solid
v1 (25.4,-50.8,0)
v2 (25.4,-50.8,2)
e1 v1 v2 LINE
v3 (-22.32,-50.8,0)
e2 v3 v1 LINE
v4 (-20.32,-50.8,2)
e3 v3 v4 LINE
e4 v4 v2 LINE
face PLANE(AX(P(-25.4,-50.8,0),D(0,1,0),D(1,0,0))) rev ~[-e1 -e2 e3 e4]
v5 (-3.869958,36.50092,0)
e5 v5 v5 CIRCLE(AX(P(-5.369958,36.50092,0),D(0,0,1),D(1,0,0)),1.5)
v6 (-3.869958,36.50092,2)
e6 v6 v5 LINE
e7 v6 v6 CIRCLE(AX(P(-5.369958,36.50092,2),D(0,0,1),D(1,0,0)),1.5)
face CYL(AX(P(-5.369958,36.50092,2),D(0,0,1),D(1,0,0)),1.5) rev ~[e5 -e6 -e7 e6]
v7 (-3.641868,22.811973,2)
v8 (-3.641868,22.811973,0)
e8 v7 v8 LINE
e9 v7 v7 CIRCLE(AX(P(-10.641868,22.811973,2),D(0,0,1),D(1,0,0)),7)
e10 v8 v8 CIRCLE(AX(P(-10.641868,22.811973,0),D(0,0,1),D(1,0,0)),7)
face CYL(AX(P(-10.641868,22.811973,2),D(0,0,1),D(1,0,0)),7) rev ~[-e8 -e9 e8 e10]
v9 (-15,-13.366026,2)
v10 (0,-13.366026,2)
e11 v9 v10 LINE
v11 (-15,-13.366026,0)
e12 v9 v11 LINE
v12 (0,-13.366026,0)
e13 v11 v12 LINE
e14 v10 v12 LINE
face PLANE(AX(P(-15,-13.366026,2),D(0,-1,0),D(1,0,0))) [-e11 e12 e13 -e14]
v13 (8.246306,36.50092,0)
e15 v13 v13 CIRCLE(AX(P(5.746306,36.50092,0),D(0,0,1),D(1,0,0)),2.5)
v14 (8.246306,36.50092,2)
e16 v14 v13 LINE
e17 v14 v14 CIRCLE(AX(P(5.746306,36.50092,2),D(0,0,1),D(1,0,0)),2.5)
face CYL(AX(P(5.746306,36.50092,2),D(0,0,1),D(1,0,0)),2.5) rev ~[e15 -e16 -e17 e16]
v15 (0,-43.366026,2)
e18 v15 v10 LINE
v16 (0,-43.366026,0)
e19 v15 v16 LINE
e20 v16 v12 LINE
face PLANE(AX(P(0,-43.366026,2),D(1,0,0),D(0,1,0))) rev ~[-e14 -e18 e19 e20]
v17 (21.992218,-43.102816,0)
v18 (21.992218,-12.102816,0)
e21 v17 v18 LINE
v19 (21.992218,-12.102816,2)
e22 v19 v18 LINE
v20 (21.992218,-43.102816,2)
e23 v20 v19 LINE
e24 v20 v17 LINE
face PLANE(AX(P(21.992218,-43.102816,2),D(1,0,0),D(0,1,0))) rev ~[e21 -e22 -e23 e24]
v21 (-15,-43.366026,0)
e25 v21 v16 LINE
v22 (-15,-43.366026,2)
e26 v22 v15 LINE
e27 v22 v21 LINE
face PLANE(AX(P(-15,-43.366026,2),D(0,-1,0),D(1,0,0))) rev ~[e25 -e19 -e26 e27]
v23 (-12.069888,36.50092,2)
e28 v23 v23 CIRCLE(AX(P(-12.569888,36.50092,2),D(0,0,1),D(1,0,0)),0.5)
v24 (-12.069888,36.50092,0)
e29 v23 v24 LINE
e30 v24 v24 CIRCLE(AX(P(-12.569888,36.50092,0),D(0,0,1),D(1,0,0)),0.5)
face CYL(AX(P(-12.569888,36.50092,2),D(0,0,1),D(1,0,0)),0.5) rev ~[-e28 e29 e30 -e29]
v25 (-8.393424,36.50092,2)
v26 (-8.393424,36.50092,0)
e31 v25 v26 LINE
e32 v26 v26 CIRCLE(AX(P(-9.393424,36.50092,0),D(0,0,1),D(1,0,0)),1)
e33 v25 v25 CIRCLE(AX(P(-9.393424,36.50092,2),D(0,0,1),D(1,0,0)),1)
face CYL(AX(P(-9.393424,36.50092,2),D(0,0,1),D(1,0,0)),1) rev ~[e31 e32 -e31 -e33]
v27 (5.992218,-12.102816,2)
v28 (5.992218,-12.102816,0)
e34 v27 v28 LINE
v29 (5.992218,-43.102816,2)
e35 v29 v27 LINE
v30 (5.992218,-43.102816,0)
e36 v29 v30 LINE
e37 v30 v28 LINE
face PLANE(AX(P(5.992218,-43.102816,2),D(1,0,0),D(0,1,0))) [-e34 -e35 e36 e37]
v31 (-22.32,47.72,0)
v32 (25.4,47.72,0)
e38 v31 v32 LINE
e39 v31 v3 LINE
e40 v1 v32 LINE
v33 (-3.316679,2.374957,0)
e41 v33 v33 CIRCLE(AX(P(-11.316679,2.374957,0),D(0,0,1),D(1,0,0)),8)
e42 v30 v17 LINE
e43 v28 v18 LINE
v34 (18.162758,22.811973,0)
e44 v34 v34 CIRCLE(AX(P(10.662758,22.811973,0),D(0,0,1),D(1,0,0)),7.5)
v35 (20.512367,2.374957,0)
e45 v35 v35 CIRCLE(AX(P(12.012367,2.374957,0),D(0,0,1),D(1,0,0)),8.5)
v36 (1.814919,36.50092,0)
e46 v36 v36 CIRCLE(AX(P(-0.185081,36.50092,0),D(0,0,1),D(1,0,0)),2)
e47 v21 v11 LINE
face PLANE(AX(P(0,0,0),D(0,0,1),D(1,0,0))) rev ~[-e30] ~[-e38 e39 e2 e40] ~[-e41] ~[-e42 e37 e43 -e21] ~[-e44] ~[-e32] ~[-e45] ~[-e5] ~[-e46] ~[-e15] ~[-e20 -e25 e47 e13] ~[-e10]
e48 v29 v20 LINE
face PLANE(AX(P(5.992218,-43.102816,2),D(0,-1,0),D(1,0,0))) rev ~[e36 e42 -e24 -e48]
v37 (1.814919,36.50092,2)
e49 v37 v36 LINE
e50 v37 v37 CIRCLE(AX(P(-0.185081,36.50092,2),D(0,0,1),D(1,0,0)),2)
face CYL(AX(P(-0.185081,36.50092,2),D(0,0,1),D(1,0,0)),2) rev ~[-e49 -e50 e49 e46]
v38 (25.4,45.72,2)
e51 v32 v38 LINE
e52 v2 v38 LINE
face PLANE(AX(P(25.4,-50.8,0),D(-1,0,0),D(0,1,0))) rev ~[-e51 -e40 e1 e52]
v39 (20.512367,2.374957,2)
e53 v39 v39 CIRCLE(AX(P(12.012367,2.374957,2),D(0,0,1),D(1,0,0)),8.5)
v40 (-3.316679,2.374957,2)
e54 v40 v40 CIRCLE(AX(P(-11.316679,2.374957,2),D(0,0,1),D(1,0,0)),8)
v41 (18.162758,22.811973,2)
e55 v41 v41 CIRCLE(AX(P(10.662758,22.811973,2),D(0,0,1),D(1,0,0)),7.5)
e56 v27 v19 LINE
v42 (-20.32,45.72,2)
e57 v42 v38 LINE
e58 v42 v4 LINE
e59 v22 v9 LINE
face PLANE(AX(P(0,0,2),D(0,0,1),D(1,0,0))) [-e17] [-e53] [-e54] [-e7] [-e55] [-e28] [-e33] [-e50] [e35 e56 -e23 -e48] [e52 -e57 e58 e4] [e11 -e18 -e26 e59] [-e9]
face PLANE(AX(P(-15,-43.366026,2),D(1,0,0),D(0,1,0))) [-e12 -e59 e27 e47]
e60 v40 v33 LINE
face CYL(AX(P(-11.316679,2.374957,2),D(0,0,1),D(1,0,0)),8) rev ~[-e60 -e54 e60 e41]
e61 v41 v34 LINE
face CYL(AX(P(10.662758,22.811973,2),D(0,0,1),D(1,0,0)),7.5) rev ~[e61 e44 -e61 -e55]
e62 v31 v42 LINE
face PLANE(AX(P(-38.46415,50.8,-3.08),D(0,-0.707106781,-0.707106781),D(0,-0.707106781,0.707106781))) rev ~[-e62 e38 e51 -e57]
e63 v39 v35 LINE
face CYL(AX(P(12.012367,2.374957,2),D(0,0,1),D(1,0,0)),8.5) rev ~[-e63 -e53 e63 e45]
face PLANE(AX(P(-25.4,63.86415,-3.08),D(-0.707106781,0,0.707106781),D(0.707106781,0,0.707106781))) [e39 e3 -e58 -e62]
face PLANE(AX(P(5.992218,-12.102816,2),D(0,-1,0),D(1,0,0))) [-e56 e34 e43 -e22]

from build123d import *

# Parameters (mm, degrees)
F0_W        = 50.8
F0_H        = 101.6
F1_DEPTH    = 2
F2_T1_DEPTH = 127.7282991577
F2_T3_DEPTH = 76.9282991577
F3_W        = 15
F3_H        = 30
F3_W_2      = 16
F3_H_2      = 31
F3_R        = 8.5
F3_R_2      = 8
F3_R_3      = 7
F3_R_4      = 7.5
F3_R_5      = 2.5
F3_R_6      = 2
F3_R_7      = 1.5
F3_R_8      = 1
F3_R_9      = 0.5
F4_DEPTH    = 25.4


# Not quite as in the source:
# - a fillet or chamfer that OpenCascade refuses, or shapes differently, is made with other operations: its cross-section is extruded or revolved along the edge and cut away or added


with BuildPart() as f1:
    # F0 (on Top) → F1 (new body)
    with BuildSketch(Plane.XY):
        Rectangle(F0_W, F0_H)
    extrude(amount=F1_DEPTH)

    # F2: chamfer of 5.08 on 2 edges, made by hand

    # F2_s2 → F2_t1 (cut)
    with BuildSketch(Plane.XZ.offset(-63.8641495789)):
        Polygon((-25.4, -3.08), (-20.32, 2), (-25.4, 2), align=None)
    extrude(amount=F2_T1_DEPTH, mode=Mode.SUBTRACT)

    # F2_s4 → F2_t3 (cut)
    with BuildSketch(Plane.YZ.offset(-38.4641495789)):
        Polygon((50.8, -3.08), (45.72, 2), (50.8, 2), align=None)
    extrude(amount=F2_T3_DEPTH, mode=Mode.SUBTRACT)

    # F3 (on face) → F4 (cut)
    with BuildSketch(Plane.XY.offset(2)):
        with Locations((-7.5, -28.3660255373)):
            Rectangle(F3_W, F3_H)
        with Locations((13.9922183007, -27.6028160006)):
            Rectangle(F3_W_2, F3_H_2)
        with Locations((12.0123671368, 2.37495685)):
            Circle(F3_R)
        with Locations((-11.3166794181, 2.37495685)):
            Circle(F3_R_2)
        with Locations((-10.6418682262, 22.8119734675)):
            Circle(F3_R_3)
        with Locations((10.6627577916, 22.8119734675)):
            Circle(F3_R_4)
        with Locations((5.7463059202, 36.5009196103)):
            Circle(F3_R_5)
        with Locations((-0.1850809494, 36.5009196103)):
            Circle(F3_R_6)
        with Locations((-5.3699584678, 36.5009196103)):
            Circle(F3_R_7)
        with Locations((-9.3934237957, 36.5009196103)):
            Circle(F3_R_8)
        with Locations((-12.5698875636, 36.5009196103)):
            Circle(F3_R_9)
    extrude(amount=-F4_DEPTH, mode=Mode.SUBTRACT)


solid = f1.part
